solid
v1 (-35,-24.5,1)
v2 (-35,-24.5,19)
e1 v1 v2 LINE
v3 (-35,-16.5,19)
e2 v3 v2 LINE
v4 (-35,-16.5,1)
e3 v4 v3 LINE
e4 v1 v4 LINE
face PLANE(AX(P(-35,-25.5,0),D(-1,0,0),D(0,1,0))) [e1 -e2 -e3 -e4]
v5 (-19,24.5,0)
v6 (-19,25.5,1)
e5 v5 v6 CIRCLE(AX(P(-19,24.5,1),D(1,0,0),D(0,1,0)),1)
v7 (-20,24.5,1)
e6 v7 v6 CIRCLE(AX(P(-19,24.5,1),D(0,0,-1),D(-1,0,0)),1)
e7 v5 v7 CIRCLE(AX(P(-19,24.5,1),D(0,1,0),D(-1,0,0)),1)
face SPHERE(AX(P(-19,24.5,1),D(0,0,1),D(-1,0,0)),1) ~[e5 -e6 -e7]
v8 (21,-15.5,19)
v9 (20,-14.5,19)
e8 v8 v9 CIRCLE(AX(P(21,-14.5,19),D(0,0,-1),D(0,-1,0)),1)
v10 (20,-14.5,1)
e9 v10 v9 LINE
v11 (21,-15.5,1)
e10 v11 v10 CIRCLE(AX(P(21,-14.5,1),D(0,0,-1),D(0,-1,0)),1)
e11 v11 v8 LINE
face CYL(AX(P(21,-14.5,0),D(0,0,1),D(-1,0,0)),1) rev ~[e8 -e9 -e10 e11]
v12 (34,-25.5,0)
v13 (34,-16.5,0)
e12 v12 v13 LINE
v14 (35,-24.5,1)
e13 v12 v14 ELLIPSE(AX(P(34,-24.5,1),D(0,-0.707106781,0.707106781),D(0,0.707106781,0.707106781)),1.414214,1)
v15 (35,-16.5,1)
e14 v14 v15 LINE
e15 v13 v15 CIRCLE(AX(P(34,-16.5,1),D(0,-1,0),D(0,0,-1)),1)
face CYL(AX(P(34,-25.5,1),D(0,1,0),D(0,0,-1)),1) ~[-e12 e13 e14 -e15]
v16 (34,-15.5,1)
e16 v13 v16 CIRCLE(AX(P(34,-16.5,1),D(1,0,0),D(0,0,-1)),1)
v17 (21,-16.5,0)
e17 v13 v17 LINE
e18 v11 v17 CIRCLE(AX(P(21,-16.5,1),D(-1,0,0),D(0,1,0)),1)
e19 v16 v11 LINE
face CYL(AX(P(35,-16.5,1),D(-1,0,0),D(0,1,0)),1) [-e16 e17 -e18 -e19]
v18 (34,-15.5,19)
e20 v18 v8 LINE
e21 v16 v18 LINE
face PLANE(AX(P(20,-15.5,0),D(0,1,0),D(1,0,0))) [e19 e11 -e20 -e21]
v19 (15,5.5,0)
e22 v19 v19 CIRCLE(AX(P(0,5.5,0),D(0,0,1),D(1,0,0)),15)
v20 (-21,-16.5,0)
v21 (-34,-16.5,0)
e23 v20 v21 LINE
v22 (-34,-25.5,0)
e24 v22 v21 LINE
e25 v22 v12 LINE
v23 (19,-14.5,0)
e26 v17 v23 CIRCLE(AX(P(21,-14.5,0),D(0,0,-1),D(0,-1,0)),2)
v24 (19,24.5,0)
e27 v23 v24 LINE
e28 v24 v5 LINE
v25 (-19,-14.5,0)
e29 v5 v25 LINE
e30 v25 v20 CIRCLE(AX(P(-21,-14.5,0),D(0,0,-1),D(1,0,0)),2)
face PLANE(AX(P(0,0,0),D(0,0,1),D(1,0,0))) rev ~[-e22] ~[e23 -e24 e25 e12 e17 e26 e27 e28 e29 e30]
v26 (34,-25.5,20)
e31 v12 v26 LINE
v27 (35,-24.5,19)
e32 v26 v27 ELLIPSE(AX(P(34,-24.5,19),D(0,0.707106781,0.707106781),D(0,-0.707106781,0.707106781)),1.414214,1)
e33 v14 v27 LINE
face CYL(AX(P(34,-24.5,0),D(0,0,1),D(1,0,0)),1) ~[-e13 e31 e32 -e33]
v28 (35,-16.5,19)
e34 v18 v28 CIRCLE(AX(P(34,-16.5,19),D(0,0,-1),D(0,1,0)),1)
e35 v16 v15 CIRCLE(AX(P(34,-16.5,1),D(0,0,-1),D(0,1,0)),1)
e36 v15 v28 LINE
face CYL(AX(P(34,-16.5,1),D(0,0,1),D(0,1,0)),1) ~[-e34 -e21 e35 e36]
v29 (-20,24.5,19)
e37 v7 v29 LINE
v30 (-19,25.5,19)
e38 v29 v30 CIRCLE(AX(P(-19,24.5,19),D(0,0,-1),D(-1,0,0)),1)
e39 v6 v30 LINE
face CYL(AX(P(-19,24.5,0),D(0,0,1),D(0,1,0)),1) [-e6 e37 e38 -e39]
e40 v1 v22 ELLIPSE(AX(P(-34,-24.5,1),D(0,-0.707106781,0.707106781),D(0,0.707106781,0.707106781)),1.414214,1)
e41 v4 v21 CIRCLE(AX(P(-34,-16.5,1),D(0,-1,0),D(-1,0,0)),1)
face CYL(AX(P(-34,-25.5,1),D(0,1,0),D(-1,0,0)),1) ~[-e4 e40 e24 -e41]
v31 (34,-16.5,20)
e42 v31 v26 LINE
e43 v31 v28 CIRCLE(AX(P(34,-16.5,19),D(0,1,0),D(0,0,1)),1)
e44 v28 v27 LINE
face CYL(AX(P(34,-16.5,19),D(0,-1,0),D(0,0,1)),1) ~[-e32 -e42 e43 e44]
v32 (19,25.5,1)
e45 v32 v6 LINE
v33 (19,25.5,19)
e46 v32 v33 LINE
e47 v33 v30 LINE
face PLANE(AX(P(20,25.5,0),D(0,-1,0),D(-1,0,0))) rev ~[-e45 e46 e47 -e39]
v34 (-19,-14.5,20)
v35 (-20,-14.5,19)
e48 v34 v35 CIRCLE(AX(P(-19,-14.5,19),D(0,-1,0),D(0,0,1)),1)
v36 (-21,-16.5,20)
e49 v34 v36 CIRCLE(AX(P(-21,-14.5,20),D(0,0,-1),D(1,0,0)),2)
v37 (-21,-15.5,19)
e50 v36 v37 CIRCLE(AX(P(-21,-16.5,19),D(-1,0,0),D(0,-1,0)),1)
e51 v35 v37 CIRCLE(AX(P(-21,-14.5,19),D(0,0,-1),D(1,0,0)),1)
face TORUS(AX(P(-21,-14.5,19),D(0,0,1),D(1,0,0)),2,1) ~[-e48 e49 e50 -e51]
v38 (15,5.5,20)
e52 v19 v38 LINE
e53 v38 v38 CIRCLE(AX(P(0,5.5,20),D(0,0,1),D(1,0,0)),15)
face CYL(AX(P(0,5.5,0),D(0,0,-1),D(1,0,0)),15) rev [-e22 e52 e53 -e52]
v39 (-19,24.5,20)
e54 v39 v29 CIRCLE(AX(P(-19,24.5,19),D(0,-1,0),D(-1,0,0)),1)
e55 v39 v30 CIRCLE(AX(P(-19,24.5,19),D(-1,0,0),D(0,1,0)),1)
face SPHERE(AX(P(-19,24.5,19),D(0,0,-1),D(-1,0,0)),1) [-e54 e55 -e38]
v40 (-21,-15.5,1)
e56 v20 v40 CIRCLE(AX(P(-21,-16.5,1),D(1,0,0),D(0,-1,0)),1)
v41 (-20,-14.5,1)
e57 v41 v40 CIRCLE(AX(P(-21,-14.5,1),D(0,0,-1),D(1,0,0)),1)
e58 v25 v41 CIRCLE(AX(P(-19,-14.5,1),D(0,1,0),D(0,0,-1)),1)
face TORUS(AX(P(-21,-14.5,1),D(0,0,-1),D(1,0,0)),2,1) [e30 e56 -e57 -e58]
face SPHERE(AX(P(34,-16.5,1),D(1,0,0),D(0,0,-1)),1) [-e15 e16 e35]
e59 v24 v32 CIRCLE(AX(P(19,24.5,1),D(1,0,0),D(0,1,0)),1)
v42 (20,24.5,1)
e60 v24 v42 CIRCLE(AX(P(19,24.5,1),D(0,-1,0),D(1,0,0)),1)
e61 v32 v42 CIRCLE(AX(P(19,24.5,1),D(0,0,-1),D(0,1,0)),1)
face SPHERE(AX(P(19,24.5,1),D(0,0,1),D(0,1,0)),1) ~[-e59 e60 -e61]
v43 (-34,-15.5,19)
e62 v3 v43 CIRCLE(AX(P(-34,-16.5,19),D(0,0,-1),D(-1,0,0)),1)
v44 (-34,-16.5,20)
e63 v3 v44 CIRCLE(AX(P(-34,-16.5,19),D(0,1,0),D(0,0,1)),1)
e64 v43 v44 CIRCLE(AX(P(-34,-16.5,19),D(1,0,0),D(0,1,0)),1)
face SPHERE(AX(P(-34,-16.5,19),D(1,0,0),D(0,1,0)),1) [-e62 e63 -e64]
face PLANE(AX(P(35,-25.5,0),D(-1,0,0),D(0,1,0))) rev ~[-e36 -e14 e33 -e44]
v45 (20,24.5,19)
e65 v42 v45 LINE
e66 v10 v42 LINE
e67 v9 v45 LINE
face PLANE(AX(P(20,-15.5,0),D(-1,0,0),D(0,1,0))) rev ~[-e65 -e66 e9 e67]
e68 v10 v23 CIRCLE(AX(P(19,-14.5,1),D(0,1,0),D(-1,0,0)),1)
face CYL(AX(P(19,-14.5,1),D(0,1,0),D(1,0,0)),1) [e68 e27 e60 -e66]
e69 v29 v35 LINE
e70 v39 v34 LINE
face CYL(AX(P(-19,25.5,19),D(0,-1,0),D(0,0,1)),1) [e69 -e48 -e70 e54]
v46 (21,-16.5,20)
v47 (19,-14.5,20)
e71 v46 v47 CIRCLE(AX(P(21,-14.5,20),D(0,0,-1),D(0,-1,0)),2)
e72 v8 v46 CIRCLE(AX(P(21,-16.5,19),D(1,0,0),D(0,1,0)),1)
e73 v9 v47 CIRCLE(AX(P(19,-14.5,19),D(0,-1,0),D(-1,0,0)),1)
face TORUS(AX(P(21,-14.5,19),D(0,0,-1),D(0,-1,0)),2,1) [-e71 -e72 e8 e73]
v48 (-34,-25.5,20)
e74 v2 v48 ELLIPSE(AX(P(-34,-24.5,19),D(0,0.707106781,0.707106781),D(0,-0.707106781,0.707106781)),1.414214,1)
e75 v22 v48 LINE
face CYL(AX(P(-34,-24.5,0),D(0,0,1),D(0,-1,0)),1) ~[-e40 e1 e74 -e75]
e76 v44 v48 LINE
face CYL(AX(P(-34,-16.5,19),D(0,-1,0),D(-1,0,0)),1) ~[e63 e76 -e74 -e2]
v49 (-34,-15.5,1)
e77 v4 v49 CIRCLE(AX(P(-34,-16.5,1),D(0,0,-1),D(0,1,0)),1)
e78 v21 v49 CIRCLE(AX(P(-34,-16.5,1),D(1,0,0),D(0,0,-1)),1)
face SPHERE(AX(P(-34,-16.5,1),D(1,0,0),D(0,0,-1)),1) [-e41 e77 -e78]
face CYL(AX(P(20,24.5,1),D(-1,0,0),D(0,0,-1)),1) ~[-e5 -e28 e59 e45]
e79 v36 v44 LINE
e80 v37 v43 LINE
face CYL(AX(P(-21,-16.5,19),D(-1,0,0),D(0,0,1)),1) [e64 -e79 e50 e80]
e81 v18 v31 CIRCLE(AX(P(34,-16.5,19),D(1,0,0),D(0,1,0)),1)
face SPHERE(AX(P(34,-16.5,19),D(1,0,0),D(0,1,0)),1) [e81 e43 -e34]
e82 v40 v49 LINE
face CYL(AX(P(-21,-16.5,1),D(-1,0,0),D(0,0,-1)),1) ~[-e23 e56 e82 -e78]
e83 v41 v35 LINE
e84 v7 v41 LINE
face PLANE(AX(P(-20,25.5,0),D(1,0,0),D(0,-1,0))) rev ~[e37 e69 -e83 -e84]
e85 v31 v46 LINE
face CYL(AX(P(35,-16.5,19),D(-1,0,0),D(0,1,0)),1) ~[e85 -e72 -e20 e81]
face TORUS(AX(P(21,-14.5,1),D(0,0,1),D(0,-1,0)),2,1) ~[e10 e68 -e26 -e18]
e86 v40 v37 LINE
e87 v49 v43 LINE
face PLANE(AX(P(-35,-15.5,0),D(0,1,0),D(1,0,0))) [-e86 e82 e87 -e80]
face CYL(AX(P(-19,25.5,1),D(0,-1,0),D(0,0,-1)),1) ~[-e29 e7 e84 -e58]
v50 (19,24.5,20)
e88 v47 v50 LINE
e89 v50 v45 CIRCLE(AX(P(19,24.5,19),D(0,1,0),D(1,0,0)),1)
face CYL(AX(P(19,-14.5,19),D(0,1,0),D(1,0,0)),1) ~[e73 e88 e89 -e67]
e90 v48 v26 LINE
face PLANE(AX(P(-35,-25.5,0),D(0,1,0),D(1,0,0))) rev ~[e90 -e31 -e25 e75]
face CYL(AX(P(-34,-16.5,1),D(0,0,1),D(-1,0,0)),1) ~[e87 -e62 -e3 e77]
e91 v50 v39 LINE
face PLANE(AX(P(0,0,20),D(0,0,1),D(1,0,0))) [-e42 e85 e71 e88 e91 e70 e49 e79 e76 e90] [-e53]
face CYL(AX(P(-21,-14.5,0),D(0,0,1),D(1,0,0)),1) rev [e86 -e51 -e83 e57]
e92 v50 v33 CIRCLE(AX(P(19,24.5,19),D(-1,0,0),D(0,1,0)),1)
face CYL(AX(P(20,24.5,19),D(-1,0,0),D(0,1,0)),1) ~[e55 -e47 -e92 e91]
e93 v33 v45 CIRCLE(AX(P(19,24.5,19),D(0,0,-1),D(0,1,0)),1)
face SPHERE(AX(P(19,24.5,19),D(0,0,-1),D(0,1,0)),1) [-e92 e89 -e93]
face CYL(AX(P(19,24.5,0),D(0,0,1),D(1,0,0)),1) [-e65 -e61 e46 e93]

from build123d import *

# Parameters (mm, degrees)
F0_R     = 15
F0_W     = 15
F0_H     = 10
F1_DEPTH = 20
F2_F1_R  = 1
F2_F2_R  = 1
F3_R     = 1


with BuildPart() as f1:
    # F0 (on Top) → F1 (new body)
    with BuildSketch(Plane.XY):
        Polygon((-20, -25.5), (20, -25.5), (20, -15.5), (20, 25.5), (-20, 25.5), (-20, -15.5), align=None)
        with Locations((0, 5.5)):
            Circle(F0_R, mode=Mode.SUBTRACT)
        with Locations((-27.5, -20.5)):
            Rectangle(F0_W, F0_H)
        with Locations((27.5, -20.5)):
            Rectangle(F0_W, F0_H)
    extrude(amount=F1_DEPTH)

    # F2: fillet of radius 1 on 10 edges, made by hand

    # F2_f1
    f2_f1_edges = [f1.edges().sort_by_distance(p)[0] for p in [
        (-20, -15.5, 10),
        (20, -15.5, 10),
    ]]
    fillet(f2_f1_edges, radius=F2_F1_R)

    # F2_f2
    f2_f2_edges = [f1.edges().sort_by_distance(p)[0] for p in [
        (-20, 25.5, 10),
        (-20, 5.5, 0),
        (-20, 5.5, 20),
        (20, 25.5, 10),
        (0, 25.5, 0),
        (0, 25.5, 20),
        (20, 5.5, 0),
        (20, 5.5, 20),
        (20.2928932188, -15.2071067812, 20),
        (20.2928932188, -15.2071067812, 0),
        (-20.2928932188, -15.2071067812, 20),
        (-20.2928932188, -15.2071067812, 0),
    ]]
    fillet(f2_f2_edges, radius=F2_F2_R)

    # F3
    f3_edges = [f1.edges().sort_by_distance(p)[0] for p in [
        (21, -15.5, 10),
        (28, -15.5, 1),
        (28, -15.5, 19),
        (35, -15.5, 10),
        (35, -15.792893, 0.292893),
        (35, -15.792893, 19.707107),
        (35, -21, 0),
        (35, -21, 20),
        (35, -25.5, 10),
        (-21, -15.5, 10),
        (-28, -15.5, 1),
        (-28, -15.5, 19),
        (-35, -15.5, 10),
        (-35, -15.792893, 0.292893),
        (-35, -15.792893, 19.707107),
        (-35, -21, 0),
        (-35, -21, 20),
        (-35, -25.5, 10),
    ]]
    fillet(f3_edges, radius=F3_R)


solid = f1.part
